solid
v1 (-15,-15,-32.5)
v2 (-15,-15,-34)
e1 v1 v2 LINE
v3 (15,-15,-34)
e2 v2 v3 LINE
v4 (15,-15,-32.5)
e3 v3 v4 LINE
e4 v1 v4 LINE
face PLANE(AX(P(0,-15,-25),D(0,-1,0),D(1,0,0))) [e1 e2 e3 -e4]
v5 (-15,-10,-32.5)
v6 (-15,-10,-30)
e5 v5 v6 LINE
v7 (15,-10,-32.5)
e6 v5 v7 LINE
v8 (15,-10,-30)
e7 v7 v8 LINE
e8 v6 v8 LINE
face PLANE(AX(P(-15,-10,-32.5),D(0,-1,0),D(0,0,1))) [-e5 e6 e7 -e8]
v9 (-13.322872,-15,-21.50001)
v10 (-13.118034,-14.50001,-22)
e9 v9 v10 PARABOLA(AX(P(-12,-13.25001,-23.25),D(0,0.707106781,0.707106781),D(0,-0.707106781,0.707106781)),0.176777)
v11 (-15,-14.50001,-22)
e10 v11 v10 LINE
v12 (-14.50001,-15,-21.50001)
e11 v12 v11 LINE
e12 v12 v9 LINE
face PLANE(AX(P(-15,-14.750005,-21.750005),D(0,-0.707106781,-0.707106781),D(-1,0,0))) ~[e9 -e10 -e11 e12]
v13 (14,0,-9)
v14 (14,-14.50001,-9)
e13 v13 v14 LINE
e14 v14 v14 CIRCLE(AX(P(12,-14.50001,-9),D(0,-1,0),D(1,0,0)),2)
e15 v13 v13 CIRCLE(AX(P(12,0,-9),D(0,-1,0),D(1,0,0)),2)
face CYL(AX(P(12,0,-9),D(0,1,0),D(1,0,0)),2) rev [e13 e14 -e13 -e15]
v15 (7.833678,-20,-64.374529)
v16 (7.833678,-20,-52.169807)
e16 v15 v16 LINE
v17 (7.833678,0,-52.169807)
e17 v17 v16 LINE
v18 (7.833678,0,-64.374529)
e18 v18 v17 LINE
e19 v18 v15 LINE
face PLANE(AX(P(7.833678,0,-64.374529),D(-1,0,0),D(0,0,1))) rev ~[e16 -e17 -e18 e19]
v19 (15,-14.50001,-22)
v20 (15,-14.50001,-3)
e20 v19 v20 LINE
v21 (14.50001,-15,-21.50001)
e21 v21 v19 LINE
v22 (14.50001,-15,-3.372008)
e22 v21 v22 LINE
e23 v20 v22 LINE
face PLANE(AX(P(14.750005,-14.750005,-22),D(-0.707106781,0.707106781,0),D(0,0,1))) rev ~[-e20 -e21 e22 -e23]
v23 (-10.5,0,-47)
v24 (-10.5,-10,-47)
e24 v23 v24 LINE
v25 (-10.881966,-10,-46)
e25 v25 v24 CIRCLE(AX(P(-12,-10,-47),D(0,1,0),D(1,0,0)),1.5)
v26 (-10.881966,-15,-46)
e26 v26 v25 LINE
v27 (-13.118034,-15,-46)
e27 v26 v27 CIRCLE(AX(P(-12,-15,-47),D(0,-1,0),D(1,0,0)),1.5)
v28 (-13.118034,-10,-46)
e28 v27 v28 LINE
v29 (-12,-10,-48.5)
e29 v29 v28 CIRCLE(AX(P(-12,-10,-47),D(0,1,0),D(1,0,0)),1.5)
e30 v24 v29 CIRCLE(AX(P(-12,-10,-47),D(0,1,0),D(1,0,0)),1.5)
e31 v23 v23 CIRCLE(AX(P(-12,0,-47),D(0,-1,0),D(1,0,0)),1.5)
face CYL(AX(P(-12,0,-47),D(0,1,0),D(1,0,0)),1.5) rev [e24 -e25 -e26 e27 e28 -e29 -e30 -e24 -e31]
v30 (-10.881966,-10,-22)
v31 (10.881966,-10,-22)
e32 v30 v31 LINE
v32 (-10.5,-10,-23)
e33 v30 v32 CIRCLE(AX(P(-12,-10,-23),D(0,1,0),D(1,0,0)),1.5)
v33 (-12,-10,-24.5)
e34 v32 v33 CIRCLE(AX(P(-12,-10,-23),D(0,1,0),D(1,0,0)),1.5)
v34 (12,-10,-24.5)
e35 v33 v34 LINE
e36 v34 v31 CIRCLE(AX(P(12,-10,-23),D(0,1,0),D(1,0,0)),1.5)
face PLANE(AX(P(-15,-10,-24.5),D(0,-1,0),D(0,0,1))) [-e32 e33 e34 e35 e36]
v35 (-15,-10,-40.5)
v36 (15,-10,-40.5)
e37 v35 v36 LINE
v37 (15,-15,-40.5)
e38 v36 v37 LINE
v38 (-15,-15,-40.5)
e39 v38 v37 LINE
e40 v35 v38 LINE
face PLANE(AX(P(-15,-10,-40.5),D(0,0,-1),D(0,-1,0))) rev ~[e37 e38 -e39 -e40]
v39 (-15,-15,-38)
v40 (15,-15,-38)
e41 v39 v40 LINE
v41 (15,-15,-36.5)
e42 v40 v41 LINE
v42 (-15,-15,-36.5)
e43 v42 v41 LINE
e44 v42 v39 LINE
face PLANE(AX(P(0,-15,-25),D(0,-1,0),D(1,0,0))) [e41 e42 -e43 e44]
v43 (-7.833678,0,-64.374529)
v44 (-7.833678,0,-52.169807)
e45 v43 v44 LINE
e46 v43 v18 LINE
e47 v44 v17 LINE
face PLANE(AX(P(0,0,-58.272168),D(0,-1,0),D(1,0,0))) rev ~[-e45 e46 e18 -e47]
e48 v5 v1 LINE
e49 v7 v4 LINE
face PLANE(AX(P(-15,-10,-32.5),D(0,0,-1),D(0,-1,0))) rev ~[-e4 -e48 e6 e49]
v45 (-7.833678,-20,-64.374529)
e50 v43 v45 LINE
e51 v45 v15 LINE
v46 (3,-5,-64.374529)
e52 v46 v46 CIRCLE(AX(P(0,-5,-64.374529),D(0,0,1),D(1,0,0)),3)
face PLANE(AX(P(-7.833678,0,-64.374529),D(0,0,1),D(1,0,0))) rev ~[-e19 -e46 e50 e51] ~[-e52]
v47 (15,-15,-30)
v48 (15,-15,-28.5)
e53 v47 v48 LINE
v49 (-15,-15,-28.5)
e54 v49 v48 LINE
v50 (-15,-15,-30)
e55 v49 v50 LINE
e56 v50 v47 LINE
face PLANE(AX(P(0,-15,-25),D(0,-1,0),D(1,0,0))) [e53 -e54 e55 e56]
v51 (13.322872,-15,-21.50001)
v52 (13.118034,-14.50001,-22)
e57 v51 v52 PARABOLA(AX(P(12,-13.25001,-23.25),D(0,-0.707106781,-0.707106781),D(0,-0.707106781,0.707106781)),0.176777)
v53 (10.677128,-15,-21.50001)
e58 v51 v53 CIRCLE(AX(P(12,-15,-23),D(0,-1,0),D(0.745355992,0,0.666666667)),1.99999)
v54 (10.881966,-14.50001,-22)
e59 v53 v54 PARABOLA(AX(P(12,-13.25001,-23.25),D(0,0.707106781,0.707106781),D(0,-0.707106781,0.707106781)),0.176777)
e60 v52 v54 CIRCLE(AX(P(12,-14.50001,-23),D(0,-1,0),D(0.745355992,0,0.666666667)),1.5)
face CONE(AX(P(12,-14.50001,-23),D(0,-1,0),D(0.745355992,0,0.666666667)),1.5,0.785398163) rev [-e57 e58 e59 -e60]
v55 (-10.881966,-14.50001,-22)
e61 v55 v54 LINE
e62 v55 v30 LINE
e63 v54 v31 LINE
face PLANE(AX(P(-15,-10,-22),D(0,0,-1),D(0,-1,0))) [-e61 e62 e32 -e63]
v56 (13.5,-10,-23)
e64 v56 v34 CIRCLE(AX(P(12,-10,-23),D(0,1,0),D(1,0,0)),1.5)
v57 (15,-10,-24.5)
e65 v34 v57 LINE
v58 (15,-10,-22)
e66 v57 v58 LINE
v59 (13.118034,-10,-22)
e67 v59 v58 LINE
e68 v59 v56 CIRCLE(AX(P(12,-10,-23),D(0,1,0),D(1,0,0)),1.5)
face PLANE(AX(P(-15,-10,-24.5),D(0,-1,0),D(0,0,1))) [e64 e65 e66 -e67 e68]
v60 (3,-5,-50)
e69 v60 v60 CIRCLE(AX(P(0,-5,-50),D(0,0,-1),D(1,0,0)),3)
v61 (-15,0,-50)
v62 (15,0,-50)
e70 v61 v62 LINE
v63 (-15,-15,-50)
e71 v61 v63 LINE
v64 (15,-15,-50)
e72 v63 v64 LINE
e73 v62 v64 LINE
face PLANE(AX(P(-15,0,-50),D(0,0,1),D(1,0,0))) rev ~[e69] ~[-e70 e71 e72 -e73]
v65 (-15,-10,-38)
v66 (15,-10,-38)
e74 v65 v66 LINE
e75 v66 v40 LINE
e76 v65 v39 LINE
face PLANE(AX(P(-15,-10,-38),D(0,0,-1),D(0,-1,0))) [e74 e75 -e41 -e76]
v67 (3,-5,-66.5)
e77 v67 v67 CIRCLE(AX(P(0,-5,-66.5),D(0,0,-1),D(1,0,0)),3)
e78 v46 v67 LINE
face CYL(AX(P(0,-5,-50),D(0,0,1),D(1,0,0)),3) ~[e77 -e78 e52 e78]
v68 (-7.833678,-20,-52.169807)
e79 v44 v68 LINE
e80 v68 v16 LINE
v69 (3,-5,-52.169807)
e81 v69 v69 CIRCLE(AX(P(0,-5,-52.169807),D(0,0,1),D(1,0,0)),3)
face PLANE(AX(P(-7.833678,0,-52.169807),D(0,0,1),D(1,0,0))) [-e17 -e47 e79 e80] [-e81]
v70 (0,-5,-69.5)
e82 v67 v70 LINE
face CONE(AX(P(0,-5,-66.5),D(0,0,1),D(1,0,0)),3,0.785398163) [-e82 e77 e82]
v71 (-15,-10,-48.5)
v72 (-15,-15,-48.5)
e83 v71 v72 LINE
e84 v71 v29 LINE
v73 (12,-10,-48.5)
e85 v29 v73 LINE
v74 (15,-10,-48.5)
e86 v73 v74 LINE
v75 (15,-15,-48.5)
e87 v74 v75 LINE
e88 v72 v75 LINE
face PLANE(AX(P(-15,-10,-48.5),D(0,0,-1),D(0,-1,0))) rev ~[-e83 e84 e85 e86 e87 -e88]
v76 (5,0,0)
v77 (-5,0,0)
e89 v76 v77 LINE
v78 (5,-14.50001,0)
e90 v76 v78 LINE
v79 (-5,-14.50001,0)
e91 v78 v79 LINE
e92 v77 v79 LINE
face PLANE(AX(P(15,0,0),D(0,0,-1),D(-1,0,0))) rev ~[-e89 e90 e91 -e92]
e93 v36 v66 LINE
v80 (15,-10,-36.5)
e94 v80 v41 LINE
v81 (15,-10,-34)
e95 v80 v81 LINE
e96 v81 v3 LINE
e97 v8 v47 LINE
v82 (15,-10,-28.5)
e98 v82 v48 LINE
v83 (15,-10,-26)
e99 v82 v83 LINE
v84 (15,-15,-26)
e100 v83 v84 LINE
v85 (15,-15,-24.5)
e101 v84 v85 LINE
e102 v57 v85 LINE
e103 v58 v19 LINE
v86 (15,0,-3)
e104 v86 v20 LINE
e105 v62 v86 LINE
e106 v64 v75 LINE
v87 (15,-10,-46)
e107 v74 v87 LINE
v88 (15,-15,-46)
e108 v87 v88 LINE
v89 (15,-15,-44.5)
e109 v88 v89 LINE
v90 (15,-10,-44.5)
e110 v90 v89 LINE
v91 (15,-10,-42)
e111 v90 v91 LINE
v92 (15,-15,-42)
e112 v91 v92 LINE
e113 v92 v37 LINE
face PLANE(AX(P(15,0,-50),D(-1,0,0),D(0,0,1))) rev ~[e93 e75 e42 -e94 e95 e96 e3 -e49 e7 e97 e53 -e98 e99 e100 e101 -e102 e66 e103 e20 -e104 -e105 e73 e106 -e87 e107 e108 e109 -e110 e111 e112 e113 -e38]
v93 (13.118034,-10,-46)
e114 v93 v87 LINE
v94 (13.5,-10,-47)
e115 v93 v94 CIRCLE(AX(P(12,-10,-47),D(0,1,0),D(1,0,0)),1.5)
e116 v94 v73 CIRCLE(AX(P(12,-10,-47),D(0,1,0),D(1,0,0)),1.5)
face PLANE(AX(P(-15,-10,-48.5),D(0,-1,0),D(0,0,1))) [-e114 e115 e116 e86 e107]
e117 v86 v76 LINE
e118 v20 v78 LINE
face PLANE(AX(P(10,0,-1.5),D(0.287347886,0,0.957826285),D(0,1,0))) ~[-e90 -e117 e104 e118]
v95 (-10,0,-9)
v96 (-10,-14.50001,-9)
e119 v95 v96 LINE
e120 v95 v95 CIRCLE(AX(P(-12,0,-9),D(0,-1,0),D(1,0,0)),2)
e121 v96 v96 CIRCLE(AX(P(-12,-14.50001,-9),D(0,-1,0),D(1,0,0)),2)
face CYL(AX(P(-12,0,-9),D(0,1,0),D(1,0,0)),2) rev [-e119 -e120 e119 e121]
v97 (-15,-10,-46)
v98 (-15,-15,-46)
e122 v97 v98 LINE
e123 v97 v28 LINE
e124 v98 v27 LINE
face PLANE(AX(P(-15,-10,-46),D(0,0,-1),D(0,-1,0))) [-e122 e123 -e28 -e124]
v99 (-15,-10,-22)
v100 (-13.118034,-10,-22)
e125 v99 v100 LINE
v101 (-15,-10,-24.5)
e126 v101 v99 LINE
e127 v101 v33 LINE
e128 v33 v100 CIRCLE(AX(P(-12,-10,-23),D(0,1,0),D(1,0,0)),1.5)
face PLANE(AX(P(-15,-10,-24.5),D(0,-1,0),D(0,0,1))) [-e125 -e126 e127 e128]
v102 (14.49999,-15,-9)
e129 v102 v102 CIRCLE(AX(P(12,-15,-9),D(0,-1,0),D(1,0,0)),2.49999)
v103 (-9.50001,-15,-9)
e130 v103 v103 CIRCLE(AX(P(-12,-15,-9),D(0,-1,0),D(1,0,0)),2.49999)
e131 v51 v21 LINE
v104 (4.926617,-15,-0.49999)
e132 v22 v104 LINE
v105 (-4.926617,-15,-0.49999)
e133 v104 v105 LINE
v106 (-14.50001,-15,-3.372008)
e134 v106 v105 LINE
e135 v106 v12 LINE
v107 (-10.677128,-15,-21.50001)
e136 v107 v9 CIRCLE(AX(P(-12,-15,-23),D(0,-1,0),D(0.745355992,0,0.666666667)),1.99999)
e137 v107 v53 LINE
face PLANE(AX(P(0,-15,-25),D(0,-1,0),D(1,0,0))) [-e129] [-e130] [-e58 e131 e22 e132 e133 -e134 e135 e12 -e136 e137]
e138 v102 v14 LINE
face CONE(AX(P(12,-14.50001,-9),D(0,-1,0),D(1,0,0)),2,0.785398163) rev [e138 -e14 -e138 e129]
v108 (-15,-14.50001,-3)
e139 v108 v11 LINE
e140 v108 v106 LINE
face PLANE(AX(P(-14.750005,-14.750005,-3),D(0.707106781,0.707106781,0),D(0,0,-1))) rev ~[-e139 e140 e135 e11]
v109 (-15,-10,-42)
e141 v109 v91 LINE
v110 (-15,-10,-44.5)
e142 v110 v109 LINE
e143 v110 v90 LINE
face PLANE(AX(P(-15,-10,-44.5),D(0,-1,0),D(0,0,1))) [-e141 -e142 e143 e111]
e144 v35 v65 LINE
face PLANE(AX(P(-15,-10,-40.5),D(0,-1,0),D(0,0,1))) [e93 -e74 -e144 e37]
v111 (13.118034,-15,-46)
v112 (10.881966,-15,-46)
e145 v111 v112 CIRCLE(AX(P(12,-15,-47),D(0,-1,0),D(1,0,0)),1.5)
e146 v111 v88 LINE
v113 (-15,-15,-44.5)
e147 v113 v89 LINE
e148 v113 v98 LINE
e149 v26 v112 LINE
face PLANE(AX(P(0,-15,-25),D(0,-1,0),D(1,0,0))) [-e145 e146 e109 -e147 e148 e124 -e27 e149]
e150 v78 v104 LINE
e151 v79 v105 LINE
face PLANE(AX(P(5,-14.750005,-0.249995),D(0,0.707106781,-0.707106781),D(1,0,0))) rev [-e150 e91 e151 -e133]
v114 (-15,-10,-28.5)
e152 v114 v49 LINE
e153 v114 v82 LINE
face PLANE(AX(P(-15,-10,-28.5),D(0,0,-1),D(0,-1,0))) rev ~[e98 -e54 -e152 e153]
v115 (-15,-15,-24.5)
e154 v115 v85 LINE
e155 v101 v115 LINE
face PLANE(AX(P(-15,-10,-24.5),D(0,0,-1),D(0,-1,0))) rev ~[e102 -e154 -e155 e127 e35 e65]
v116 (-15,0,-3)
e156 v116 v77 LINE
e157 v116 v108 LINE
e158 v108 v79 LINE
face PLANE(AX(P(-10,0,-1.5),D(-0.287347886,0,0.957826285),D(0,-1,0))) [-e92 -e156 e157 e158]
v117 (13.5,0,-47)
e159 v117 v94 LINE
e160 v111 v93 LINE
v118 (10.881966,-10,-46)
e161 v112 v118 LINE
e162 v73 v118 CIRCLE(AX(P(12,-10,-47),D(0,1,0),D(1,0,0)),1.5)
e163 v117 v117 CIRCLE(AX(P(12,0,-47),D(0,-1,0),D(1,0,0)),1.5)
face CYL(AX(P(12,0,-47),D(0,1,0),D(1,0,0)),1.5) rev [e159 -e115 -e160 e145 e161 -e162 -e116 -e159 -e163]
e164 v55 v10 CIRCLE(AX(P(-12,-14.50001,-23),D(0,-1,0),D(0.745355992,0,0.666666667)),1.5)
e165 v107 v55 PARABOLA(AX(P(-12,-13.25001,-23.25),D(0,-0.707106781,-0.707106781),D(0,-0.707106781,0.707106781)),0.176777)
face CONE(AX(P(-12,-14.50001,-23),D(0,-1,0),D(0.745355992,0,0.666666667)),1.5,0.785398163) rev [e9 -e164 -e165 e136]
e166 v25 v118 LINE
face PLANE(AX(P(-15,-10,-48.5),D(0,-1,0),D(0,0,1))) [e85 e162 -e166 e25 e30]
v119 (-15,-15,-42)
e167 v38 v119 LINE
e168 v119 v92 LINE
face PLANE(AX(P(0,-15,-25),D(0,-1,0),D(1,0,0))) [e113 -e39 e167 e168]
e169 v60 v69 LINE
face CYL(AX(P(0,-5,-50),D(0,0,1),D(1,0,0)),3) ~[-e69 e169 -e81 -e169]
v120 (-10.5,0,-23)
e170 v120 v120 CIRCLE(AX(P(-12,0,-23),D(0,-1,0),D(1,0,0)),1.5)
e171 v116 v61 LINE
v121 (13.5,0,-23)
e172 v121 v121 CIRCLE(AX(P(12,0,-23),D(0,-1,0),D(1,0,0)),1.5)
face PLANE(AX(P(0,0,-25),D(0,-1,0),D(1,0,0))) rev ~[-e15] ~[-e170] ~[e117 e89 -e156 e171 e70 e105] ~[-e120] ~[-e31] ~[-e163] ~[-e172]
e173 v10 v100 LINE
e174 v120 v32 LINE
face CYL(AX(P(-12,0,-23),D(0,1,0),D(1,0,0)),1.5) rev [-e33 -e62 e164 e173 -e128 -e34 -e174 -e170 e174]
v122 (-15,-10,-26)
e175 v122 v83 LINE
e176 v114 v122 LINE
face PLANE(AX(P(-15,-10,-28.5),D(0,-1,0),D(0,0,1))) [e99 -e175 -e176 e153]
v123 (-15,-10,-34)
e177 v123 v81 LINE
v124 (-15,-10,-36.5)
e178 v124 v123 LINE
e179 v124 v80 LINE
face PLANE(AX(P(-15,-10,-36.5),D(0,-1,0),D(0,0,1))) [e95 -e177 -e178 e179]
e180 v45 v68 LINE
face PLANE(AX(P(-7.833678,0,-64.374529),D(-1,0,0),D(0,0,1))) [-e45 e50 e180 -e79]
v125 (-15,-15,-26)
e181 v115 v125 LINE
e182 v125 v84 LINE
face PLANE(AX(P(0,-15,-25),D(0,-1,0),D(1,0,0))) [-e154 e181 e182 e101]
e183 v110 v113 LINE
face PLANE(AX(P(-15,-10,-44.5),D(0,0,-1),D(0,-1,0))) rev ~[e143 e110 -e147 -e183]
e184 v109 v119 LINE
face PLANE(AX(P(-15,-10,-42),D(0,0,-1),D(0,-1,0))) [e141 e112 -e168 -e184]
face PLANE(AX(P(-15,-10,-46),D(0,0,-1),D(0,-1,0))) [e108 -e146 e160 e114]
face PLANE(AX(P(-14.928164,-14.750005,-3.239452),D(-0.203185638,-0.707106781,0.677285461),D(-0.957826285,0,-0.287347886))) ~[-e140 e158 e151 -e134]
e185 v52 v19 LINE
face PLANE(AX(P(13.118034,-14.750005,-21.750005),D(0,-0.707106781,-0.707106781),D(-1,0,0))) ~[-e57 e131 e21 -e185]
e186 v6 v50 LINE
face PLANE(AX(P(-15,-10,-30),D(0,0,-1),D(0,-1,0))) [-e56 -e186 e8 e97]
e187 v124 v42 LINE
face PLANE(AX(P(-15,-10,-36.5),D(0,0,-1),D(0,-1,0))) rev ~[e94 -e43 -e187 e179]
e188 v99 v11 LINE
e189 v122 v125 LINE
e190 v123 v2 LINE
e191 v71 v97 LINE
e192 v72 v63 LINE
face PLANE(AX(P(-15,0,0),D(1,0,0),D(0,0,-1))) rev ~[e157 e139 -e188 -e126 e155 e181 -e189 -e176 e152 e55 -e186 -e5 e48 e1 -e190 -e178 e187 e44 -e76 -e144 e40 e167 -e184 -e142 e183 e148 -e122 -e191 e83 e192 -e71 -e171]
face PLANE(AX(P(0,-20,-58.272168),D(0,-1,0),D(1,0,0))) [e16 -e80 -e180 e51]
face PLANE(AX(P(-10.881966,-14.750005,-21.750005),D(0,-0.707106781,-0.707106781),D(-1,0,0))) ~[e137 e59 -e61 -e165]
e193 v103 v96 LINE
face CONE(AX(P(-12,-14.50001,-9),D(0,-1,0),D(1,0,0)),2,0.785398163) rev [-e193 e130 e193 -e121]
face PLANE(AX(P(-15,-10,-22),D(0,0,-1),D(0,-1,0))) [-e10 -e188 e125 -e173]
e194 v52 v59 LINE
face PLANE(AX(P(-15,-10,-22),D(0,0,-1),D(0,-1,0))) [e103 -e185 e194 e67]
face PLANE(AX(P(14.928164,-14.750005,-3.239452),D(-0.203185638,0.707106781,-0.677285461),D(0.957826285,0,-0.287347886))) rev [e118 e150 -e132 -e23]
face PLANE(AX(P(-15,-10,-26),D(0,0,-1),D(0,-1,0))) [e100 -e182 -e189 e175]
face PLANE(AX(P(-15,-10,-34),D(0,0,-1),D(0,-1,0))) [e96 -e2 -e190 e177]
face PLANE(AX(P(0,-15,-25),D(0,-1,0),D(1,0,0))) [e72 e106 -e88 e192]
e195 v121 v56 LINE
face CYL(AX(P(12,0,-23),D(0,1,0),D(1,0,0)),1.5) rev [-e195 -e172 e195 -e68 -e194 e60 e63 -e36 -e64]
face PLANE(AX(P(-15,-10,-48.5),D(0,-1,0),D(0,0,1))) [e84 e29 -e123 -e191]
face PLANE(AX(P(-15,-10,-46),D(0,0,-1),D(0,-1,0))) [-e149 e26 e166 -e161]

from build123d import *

# Parameters (mm, degrees)
F0_R       = 1.5
F0_R_2     = 2
F1_DEPTH   = 15
F2_W       = 5
F2_H       = 2.5
F3_DEPTH   = 30.001
F5_SIZE2   = 10
F5_SIZE    = 3
F5_2_SIZE2 = 10
F5_2_SIZE  = 3
F6_SIZE    = 0.49999
F4_R       = 3
F7_DEPTH   = 19.5
F8_SIZE    = 3
F9_W       = 15.6673565507
F9_H       = 12.20472157
F10_DEPTH  = 20


# Not quite as in the source:
# - a fillet or chamfer is up to 0.001 mm smaller than in the source, because OpenCascade refuses the exact size


with BuildPart() as f1:
    # F0 (on Front) → F1 (new body)
    with BuildSketch(Plane.XZ):
        Polygon((15, 0), (0, 0), (-15, 0), (-15, -50), (0, -50), (15, -50), align=None)
        with Locations((-12, -47)):
            Circle(F0_R, mode=Mode.SUBTRACT)
        with Locations((12, -47)):
            Circle(F0_R, mode=Mode.SUBTRACT)
        with Locations((-12, -23)):
            Circle(F0_R, mode=Mode.SUBTRACT)
        with Locations((-12, -9)):
            Circle(F0_R_2, mode=Mode.SUBTRACT)
        with Locations((12, -23)):
            Circle(F0_R, mode=Mode.SUBTRACT)
        with Locations((12, -9)):
            Circle(F0_R_2, mode=Mode.SUBTRACT)
    extrude(amount=F1_DEPTH)

    # F2 (on face) → F3 (cut, through all)
    with BuildSketch(Plane(origin=(-15, 0, 0), x_dir=(0, -1, 0), z_dir=(-1, 0, 0))):
        with Locations((12.5, -47.25)):
            Rectangle(F2_W, F2_H)
        with Locations((12.5, -43.25)):
            Rectangle(F2_W, F2_H)
        with Locations((12.5, -39.25)):
            Rectangle(F2_W, F2_H)
        with Locations((12.5, -35.25)):
            Rectangle(F2_W, F2_H)
        with Locations((12.5, -31.25)):
            Rectangle(F2_W, F2_H)
        with Locations((12.5, -27.25)):
            Rectangle(F2_W, F2_H)
        with Locations((12.5, -23.25)):
            Rectangle(F2_W, F2_H)
    extrude(amount=-F3_DEPTH, mode=Mode.SUBTRACT)

    # F5
    f5_edges = [f1.edges().sort_by_distance(p)[0] for p in [
        (-15, -7.5, 0),
    ]]
    f5_side = f1.faces().sort_by_distance((-15, -6.839623, -23.646226))[0]
    chamfer(f5_edges, length=F5_SIZE, length2=F5_SIZE2, reference=f5_side)

    # F5#2
    f5_2_edges = [f1.edges().sort_by_distance(p)[0] for p in [
        (15, -7.5, 0),
    ]]
    f5_2_side = f1.faces().sort_by_distance((15, -6.839623, -23.646226))[0]
    chamfer(f5_2_edges, length=F5_2_SIZE, length2=F5_2_SIZE2, reference=f5_2_side)

    # F6 (size 0.5 in the source; OpenCascade refuses exactly that, so slightly less here)
    f6_edges = [f1.edges().sort_by_distance(p)[0] for p in [
        (0, -15, 0),
        (10, -15, -1.5),
        (-10, -15, -1.5),
        (15, -15, -12.5),
        (-15, -15, -12.5),
        (14.059017, -15, -22),
        (-14.059017, -15, -22),
        (12, -15, -21.5),
        (-12, -15, -21.5),
        (0, -15, -22),
        (-14, -15, -9),
        (10, -15, -9),
    ]]
    chamfer(f6_edges, length=F6_SIZE)

    # F4 (on face) → F7 (join)
    with BuildSketch(Plane(origin=(0, 0, -50), x_dir=(1, 0, 0), z_dir=(0, 0, -1))):
        with Locations((0, 5)):
            Circle(F4_R)
    extrude(amount=F7_DEPTH)

    # F8
    f8_edges = [f1.edges().sort_by_distance(p)[0] for p in [
        (-3, -5, -69.5),
    ]]
    chamfer(f8_edges, length=F8_SIZE)

    # F9 (on Front) → F10 (join)
    with BuildSketch(Plane.XZ):
        with Locations((0, -58.2721680403)):
            Rectangle(F9_W, F9_H)
    extrude(amount=F10_DEPTH)


solid = f1.part
